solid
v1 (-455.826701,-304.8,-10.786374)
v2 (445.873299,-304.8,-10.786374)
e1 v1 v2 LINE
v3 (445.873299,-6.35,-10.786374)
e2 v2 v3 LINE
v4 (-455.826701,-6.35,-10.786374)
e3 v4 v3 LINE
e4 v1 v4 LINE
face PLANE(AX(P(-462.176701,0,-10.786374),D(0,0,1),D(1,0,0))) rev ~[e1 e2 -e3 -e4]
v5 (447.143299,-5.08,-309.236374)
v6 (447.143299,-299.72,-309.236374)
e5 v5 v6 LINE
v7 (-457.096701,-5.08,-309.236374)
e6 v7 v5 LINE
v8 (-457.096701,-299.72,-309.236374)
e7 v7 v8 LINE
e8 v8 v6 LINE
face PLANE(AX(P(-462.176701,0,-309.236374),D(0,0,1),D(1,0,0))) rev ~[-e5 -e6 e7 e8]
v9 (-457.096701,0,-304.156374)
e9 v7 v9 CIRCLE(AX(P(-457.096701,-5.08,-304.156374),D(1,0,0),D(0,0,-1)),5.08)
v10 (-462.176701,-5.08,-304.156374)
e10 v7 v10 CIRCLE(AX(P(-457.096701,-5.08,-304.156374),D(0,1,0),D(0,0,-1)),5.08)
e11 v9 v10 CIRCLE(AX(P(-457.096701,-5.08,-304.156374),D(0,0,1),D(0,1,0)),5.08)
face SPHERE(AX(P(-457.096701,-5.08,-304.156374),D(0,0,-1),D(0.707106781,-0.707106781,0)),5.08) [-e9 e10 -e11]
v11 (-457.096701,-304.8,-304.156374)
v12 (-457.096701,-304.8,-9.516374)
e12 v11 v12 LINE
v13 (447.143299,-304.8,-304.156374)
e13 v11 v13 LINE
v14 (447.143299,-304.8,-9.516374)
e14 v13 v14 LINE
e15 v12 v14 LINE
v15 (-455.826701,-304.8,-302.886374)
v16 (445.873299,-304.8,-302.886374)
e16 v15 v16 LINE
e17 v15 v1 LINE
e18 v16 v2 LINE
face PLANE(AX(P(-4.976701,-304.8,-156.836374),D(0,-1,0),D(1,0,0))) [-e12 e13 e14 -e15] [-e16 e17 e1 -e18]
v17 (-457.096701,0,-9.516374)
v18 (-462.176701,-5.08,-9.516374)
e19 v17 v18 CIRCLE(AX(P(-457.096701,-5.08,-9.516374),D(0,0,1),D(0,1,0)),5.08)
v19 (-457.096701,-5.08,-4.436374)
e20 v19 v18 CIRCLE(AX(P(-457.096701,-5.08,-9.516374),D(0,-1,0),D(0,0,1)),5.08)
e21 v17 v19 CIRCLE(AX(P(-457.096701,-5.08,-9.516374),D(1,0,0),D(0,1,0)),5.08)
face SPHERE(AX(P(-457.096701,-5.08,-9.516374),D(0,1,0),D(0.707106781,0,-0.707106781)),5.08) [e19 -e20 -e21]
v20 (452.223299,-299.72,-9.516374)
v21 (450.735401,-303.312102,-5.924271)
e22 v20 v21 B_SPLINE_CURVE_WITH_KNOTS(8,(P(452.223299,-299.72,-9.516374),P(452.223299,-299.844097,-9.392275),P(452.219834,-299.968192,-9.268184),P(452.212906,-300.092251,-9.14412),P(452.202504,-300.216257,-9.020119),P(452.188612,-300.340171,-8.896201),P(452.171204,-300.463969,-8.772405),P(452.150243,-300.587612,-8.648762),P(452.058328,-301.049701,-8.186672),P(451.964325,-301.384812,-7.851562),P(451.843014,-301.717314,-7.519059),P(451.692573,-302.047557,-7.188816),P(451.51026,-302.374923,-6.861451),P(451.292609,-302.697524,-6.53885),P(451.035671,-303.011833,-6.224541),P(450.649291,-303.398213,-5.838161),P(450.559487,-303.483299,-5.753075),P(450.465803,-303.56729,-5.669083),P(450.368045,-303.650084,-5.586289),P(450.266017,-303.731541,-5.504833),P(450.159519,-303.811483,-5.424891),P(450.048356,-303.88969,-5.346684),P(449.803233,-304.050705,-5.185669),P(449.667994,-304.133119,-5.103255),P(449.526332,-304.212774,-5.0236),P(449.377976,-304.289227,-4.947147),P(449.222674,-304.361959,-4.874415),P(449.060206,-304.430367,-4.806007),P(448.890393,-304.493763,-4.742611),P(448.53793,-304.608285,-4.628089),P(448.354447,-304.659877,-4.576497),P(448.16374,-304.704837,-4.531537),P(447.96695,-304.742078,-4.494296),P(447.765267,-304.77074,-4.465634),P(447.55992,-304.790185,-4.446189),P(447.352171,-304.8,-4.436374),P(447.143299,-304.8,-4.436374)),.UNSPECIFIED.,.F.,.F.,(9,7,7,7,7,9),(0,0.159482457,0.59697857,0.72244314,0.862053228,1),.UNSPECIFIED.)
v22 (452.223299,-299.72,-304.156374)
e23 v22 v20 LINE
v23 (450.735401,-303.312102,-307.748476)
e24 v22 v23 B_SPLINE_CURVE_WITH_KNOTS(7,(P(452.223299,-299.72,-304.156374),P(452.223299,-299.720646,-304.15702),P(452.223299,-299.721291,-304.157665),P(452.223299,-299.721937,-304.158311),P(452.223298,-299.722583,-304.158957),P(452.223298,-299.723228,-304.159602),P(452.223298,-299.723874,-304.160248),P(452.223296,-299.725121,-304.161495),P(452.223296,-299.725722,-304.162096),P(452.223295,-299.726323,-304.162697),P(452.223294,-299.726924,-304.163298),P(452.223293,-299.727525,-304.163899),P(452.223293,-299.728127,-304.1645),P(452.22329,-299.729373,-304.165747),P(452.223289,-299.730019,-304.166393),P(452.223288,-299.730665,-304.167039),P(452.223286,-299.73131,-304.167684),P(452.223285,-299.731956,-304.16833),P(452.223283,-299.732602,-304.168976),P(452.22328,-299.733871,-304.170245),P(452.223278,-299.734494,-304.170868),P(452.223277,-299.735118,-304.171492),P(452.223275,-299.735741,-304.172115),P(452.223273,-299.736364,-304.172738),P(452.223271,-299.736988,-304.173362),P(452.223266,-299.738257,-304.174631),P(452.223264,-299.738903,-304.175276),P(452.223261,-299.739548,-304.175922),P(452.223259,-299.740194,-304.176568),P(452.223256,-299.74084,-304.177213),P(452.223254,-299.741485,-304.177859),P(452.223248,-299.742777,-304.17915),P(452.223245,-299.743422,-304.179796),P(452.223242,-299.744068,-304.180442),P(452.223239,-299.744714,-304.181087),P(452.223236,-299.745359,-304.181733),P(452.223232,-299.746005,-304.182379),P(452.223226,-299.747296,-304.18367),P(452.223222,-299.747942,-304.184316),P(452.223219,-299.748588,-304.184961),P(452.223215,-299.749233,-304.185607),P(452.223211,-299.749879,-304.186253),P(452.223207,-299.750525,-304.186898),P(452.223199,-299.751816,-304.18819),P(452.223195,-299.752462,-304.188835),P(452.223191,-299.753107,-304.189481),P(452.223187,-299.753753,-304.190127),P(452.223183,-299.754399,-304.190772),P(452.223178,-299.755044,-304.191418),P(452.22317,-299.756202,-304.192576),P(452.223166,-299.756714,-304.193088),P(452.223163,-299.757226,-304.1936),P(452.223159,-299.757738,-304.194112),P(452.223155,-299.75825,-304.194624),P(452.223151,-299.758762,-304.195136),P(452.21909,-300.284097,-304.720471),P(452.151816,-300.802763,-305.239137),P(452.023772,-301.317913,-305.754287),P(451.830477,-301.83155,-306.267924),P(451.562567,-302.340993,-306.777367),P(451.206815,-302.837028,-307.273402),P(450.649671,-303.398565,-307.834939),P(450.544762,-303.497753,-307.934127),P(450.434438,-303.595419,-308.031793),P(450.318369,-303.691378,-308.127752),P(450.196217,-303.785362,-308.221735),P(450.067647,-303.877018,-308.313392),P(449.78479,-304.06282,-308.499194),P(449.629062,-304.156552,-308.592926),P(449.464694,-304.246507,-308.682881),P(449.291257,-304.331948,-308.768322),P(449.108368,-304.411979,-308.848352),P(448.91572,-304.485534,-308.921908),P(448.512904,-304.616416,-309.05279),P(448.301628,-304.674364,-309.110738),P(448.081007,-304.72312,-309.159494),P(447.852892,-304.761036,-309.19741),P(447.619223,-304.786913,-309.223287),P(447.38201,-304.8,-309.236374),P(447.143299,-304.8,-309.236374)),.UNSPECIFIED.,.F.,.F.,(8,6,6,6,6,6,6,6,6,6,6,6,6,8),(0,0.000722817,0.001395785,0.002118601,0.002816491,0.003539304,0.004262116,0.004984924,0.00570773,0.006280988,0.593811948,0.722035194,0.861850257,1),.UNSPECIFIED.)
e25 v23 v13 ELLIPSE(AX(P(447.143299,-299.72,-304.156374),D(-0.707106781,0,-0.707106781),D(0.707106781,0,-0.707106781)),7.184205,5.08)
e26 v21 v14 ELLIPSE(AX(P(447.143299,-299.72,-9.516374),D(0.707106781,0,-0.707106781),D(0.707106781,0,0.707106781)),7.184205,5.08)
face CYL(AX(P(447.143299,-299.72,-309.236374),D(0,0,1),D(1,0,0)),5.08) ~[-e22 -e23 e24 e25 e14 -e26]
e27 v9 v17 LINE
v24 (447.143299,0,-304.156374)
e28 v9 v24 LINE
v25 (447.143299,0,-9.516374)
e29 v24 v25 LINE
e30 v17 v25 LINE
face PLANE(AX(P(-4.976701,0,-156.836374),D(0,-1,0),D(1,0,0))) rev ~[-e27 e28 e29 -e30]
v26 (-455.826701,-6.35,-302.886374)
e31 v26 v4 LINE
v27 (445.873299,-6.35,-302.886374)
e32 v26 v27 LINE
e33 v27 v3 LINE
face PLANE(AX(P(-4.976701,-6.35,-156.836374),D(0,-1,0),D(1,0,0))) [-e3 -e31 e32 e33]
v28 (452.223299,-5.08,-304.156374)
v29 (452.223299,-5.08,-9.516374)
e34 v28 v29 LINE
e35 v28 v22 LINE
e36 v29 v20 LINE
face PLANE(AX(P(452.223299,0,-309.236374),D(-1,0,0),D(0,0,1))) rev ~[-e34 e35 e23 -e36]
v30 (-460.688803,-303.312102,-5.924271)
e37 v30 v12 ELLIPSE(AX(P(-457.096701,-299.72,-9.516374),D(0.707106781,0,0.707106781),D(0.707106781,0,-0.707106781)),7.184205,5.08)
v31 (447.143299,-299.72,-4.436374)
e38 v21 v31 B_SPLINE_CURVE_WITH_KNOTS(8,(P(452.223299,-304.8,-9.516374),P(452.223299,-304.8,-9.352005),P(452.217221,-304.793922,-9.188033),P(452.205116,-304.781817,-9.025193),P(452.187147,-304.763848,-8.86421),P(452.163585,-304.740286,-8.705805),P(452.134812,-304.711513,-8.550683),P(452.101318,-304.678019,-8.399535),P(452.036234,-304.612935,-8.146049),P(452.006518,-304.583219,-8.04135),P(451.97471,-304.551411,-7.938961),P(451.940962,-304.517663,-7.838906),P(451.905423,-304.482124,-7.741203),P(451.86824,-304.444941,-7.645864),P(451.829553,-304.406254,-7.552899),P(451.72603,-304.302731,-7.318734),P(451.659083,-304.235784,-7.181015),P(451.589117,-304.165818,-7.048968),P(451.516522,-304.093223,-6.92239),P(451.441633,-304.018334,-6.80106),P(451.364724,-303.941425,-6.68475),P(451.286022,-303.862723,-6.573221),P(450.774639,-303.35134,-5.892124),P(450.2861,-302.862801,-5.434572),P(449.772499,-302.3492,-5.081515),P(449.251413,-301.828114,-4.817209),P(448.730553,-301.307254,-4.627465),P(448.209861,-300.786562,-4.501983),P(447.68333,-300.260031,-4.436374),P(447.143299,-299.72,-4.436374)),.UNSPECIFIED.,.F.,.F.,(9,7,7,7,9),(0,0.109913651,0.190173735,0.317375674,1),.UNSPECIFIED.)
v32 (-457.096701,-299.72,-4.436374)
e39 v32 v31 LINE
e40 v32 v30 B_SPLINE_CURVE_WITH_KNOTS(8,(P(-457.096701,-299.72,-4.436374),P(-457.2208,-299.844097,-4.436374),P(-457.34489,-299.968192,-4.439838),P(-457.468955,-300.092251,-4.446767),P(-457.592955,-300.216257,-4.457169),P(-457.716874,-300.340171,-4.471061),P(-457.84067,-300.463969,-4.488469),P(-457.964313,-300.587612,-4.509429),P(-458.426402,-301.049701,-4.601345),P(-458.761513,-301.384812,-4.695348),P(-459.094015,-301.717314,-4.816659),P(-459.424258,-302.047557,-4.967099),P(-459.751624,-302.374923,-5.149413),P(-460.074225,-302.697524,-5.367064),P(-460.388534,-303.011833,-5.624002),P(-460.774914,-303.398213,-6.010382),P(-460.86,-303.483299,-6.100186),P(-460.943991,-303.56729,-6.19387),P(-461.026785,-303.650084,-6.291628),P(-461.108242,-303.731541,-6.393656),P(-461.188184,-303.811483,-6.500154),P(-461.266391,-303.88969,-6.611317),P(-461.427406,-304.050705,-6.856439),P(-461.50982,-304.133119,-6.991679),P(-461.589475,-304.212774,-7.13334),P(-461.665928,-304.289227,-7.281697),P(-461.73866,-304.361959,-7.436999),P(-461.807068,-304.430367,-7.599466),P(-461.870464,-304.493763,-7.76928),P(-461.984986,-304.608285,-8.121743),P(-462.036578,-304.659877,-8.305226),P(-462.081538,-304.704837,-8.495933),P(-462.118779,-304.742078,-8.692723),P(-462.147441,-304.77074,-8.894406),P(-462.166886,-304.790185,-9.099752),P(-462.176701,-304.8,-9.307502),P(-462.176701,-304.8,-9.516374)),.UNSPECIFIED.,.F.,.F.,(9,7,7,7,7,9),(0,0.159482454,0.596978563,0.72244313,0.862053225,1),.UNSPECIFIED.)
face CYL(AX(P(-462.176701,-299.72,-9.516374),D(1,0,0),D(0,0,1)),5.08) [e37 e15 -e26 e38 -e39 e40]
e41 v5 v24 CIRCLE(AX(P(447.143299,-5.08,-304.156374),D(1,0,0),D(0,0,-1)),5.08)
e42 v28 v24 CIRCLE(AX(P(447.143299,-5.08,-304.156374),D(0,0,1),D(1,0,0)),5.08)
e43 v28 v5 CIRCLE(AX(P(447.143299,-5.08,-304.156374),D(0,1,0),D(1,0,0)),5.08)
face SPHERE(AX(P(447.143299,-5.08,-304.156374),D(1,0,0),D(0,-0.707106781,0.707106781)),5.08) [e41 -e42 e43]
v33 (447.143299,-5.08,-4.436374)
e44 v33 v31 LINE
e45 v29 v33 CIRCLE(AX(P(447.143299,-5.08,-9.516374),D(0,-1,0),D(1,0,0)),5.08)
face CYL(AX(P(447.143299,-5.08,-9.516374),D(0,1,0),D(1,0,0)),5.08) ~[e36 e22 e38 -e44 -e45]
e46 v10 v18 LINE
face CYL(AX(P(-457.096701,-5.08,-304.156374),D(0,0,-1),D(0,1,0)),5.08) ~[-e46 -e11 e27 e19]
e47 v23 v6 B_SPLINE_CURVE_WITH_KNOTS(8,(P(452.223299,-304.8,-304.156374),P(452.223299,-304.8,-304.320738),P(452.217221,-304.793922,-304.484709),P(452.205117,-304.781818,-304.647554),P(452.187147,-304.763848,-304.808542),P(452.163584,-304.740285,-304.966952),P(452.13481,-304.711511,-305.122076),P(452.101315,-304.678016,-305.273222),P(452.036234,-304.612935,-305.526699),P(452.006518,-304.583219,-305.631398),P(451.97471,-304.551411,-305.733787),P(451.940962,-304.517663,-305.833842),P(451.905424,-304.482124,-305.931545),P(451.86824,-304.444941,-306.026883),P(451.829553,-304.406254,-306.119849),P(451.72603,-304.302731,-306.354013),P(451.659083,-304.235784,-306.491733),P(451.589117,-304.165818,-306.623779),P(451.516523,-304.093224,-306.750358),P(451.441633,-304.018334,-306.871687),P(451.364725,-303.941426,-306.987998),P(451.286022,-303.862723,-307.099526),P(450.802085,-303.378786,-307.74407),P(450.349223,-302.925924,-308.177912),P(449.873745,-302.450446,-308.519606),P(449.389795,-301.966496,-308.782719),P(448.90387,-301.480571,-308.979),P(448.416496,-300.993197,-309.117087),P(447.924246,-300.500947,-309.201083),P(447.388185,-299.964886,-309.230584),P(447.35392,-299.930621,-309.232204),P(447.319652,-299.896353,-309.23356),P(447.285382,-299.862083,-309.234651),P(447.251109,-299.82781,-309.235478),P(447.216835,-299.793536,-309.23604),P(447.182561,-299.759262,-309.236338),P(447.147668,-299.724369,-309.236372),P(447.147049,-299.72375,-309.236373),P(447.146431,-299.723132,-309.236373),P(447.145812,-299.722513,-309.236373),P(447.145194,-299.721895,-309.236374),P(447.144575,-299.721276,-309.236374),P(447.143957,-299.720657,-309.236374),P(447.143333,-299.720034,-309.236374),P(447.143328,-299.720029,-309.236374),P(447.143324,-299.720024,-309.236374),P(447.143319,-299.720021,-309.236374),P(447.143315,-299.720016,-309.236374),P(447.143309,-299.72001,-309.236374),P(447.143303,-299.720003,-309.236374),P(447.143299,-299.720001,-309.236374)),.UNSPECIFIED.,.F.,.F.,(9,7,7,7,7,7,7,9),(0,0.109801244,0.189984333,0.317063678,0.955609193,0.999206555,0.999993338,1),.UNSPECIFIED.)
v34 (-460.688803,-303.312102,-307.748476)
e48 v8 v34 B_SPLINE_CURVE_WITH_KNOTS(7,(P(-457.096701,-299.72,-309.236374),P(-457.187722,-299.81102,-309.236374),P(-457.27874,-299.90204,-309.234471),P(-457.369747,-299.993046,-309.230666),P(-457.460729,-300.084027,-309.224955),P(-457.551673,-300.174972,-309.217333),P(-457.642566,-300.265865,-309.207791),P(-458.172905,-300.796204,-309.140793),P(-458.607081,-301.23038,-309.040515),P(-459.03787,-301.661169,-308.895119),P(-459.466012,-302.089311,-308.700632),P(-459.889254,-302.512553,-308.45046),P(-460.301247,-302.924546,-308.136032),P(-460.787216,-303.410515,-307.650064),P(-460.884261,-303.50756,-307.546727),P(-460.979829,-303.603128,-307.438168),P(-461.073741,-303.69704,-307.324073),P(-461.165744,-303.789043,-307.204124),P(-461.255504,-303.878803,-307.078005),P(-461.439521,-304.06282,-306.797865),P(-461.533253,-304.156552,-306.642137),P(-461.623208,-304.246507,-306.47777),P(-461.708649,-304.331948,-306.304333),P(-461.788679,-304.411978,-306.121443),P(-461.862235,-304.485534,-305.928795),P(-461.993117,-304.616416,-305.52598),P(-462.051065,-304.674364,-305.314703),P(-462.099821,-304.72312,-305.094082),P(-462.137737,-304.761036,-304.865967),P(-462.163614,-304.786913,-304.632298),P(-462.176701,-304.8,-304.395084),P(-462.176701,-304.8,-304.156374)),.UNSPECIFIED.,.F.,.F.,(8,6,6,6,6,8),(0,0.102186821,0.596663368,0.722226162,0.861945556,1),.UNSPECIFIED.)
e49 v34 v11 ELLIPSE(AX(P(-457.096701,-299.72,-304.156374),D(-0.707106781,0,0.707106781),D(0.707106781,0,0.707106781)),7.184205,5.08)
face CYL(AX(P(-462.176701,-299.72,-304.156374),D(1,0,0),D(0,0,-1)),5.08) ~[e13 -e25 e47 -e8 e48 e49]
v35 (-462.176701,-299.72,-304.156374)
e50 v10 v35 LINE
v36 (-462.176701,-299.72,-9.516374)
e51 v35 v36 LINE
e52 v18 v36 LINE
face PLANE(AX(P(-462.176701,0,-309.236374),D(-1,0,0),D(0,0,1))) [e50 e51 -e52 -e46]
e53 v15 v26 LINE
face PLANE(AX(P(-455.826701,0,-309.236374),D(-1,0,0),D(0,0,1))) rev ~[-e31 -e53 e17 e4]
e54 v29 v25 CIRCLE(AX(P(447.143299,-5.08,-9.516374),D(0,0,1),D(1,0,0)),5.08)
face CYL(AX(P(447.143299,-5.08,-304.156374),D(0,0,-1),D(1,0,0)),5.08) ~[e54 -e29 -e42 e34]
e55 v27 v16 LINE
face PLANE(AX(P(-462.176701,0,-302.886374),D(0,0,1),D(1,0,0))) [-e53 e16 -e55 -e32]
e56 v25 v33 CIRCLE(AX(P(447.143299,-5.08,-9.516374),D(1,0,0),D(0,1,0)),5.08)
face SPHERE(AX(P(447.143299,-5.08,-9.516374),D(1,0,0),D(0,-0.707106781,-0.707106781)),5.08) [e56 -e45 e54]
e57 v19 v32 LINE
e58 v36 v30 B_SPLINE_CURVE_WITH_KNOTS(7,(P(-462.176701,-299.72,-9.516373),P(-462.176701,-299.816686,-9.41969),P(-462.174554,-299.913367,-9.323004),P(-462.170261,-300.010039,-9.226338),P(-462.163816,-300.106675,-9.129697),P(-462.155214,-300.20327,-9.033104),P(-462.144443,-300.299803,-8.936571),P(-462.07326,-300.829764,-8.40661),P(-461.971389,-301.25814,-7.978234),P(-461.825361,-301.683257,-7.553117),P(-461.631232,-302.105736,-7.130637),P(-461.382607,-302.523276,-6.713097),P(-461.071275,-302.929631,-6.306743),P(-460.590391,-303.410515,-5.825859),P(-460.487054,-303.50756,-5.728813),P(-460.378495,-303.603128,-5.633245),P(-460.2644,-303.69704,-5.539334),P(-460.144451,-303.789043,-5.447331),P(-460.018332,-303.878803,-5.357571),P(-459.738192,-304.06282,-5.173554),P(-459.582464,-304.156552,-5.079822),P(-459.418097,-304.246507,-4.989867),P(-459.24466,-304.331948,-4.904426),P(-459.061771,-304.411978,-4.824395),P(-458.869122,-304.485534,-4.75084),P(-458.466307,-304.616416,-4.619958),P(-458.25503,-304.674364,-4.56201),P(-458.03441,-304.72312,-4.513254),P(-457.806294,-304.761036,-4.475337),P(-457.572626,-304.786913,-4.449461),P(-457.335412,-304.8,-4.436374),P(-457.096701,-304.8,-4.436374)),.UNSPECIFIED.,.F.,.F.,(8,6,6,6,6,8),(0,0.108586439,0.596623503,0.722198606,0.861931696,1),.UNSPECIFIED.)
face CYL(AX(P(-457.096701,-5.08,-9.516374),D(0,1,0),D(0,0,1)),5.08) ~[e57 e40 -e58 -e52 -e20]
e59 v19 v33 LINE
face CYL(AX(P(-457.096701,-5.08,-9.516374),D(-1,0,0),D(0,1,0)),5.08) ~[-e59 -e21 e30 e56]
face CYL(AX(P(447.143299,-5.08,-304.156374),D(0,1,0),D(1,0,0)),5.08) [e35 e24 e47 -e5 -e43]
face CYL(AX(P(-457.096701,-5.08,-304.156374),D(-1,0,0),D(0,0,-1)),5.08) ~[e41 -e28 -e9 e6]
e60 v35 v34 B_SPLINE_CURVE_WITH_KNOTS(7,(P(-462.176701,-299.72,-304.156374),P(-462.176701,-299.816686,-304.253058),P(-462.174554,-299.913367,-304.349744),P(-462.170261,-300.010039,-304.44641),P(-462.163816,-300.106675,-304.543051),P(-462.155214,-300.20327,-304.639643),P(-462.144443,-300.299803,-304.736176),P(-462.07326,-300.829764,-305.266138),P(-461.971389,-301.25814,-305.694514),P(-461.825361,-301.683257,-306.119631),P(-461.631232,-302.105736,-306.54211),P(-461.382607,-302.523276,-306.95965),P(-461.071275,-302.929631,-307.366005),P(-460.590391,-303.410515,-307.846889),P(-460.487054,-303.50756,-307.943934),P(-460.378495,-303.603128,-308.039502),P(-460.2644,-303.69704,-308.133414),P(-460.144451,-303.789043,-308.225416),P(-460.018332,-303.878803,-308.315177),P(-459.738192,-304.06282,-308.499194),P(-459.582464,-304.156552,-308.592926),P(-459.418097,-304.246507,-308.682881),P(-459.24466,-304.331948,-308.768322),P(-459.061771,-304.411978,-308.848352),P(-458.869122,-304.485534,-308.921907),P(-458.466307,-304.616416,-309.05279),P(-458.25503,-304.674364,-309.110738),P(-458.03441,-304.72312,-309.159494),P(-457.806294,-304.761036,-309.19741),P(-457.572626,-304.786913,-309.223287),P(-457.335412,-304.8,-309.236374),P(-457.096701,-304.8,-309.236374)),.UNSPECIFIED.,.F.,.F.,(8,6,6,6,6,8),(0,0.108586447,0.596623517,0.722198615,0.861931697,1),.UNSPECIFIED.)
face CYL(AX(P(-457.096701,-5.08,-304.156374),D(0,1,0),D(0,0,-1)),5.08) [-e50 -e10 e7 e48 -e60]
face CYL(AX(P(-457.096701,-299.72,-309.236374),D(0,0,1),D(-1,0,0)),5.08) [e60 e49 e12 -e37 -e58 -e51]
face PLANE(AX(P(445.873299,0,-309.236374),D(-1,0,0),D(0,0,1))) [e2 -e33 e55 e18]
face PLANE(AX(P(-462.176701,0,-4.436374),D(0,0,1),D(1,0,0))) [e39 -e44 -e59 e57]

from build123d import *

# Parameters (mm, degrees)
F0_W         = 914.4
F0_H         = 304.8
F1_DEPTH     = 304.8
F2_T         = -6.35
F3_R         = 5.08
F4_T1_DEPTH  = 307.34
F4_T3_DEPTH  = 904.24
F4_T5_DEPTH  = 294.64
F4_S9_W      = 5.1816
F4_S9_H      = 5.1816
F4_T10_DEPTH = 5.1816
F4_S15_W     = 5.1816
F4_S15_H     = 5.1816
F4_T16_DEPTH = 5.1816
F4_S21_W     = 5.1816
F4_S21_H     = 5.1816
F4_T22_DEPTH = 5.1816
F4_S27_W     = 5.1816
F4_S27_H     = 5.1816
F4_T28_DEPTH = 5.1816


# Not quite as in the source:
# - a fillet or chamfer that OpenCascade refuses, or shapes differently, is made with other operations: its cross-section is extruded or revolved along the edge and cut away or added


with BuildPart() as f1:
    # F0 (on Front) → F1 (new body)
    with BuildSketch(Plane.XZ):
        with Locations((-4.9767009914, -156.8363738472)):
            Rectangle(F0_W, F0_H)
    extrude(amount=F1_DEPTH)

    # F2
    f2_openings = [f1.faces().sort_by_distance(p)[0] for p in [
        (-4.976701, -304.8, -156.836374),
    ]]
    offset(amount=F2_T, openings=f2_openings)

    # F3
    f3_edges = [f1.edges().sort_by_distance(p)[0] for p in [
        (-4.976701, -304.8, -4.436374),
        (-462.176701, -304.8, -156.836374),
        (-4.976701, -304.8, -309.236374),
        (452.223299, -304.8, -156.836374),
    ]]
    fillet(f3_edges, radius=F3_R)

    # F4: fillet of radius 5.08 on 12 edges, made by hand

    # F4_s2 → F4_t1 (cut)
    with BuildSketch(Plane.XZ.offset(5.08)):
        with BuildLine():
            ThreePointArc((452.2232990086, -9.5163738472), (450.735401457, -5.9242713988), (447.1432990086, -4.4363738472))
            Line((447.1432990086, -4.4363738472), (452.2232990086, -4.4363738472))
            Line((452.2232990086, -4.4363738472), (452.2232990086, -9.5163738472))
        make_face()
        with BuildLine():
            ThreePointArc((-457.0967009914, -4.4363738472), (-460.6888034398, -5.9242713988), (-462.1767009914, -9.5163738472))
            Line((-462.1767009914, -9.5163738472), (-462.1767009914, -4.4363738472))
            Line((-462.1767009914, -4.4363738472), (-457.0967009914, -4.4363738472))
        make_face()
        with BuildLine():
            ThreePointArc((-457.0967009914, -309.2363738472), (-460.6888034398, -307.7484762956), (-462.1767009914, -304.1563738472))
            Line((-462.1767009914, -304.1563738472), (-462.1767009914, -309.2363738472))
            Line((-462.1767009914, -309.2363738472), (-457.0967009914, -309.2363738472))
        make_face()
        with BuildLine():
            ThreePointArc((452.2232990086, -304.1563738472), (450.735401457, -307.7484762956), (447.1432990086, -309.2363738472))
            Line((447.1432990086, -309.2363738472), (452.2232990086, -309.2363738472))
            Line((452.2232990086, -309.2363738472), (452.2232990086, -304.1563738472))
        make_face()
    extrude(amount=F4_T1_DEPTH, mode=Mode.SUBTRACT)

    # F4_s4 → F4_t3 (cut)
    with BuildSketch(Plane.YZ.offset(-457.0967009914)):
        with BuildLine():
            ThreePointArc((0, -9.5163738472), (-1.4878975516, -5.9242713988), (-5.08, -4.4363738472))
            Line((-5.08, -4.4363738472), (0, -4.4363738472))
            Line((0, -4.4363738472), (0, -9.5163738472))
        make_face()
        with BuildLine():
            ThreePointArc((-5.08, -309.2363738472), (-1.4878975516, -307.7484762956), (0, -304.1563738472))
            Line((0, -304.1563738472), (0, -309.2363738472))
            Line((0, -309.2363738472), (-5.08, -309.2363738472))
        make_face()
    extrude(amount=F4_T3_DEPTH, mode=Mode.SUBTRACT)

    # F4_s6 → F4_t5 (cut)
    with BuildSketch(Plane.XY.offset(-304.1563738472)):
        with BuildLine():
            ThreePointArc((-457.0967009914, 0), (-460.6888034398, -1.4878975516), (-462.1767009914, -5.08))
            Line((-462.1767009914, -5.08), (-462.1767009914, 0))
            Line((-462.1767009914, 0), (-457.0967009914, 0))
        make_face()
        with BuildLine():
            ThreePointArc((452.2232990086, -5.08), (450.735401457, -1.4878975516), (447.1432990086, 0))
            Line((447.1432990086, 0), (452.2232990086, 0))
            Line((452.2232990086, 0), (452.2232990086, -5.08))
        make_face()
    extrude(amount=F4_T5_DEPTH, mode=Mode.SUBTRACT)


with BuildPart() as f4_tool8:
    # F4_s9 → F4_t10 (new body)
    with BuildSketch(Plane.YZ.offset(447.1432990086)):
        with Locations((-2.4892, -6.9255738472)):
            Rectangle(F4_S9_W, F4_S9_H)
    extrude(amount=F4_T10_DEPTH)

    # F4_s11 → F4_t12 (revolve, cut)
    with BuildSketch(Plane(origin=(447.1432990086, -5.08, -9.5163738472), x_dir=(0, -0.7071067812, -0.7071067812), z_dir=(0, -0.7071067812, 0.7071067812))):
        with BuildLine():
            ThreePointArc((0, -5.08), (5.08, 0), (0, 5.08))
            Line((0, 5.08), (0, -5.08))
        make_face()
    revolve(axis=Axis((447.1432990086, -5.08, -9.5163738472), (1, 0, 0)), mode=Mode.SUBTRACT)


with BuildPart() as f1_1:
    add(f1.part)

    # F4_t7: cut F4_tool8
    add(f4_tool8.part, mode=Mode.SUBTRACT)


with BuildPart() as f4_tool14:
    # F4_s15 → F4_t16 (new body)
    with BuildSketch(Plane.XZ.offset(5.08)):
        with Locations((-459.6875009914, -6.9255738472)):
            Rectangle(F4_S15_W, F4_S15_H)
    extrude(amount=-F4_T16_DEPTH)

    # F4_s17 → F4_t18 (revolve, cut)
    with BuildSketch(Plane(origin=(-457.0967009914, -5.08, -9.5163738472), x_dir=(0.7071067812, 0, -0.7071067812), z_dir=(0.7071067812, 0, 0.7071067812))):
        with BuildLine():
            ThreePointArc((0, -5.08), (5.08, 0), (0, 5.08))
            Line((0, 5.08), (0, -5.08))
        make_face()
    revolve(axis=Axis((-457.0967009914, -5.08, -9.5163738472), (0, 1, 0)), mode=Mode.SUBTRACT)


with BuildPart() as f1_2:
    add(f1_1.part)

    # F4_t13: cut F4_tool14
    add(f4_tool14.part, mode=Mode.SUBTRACT)


with BuildPart() as f4_tool20:
    # F4_s21 → F4_t22 (new body)
    with BuildSketch(Plane.XY.offset(-304.1563738472)):
        with Locations((-459.6875009914, -2.4892)):
            Rectangle(F4_S21_W, F4_S21_H)
    extrude(amount=-F4_T22_DEPTH)

    # F4_s23 → F4_t24 (revolve, cut)
    with BuildSketch(Plane(origin=(-457.0967009914, -5.08, -304.1563738472), x_dir=(0.7071067812, -0.7071067812, 0), z_dir=(0.7071067812, 0.7071067812, 0))):
        with BuildLine():
            ThreePointArc((0, -5.08), (5.08, 0), (0, 5.08))
            Line((0, 5.08), (0, -5.08))
        make_face()
    revolve(axis=Axis((-457.0967009914, -5.08, -304.1563738472), (0, 0, -1)), mode=Mode.SUBTRACT)


with BuildPart() as f1_3:
    add(f1_2.part)

    # F4_t19: cut F4_tool20
    add(f4_tool20.part, mode=Mode.SUBTRACT)


with BuildPart() as f4_tool26:
    # F4_s27 → F4_t28 (new body)
    with BuildSketch(Plane.YZ.offset(447.1432990086)):
        with Locations((-2.4892, -306.7471738472)):
            Rectangle(F4_S27_W, F4_S27_H)
    extrude(amount=F4_T28_DEPTH)

    # F4_s29 → F4_t30 (revolve, cut)
    with BuildSketch(Plane(origin=(447.1432990086, -5.08, -304.1563738472), x_dir=(0, -0.7071067812, 0.7071067812), z_dir=(0, 0.7071067812, 0.7071067812))):
        with BuildLine():
            ThreePointArc((0, -5.08), (5.08, 0), (0, 5.08))
            Line((0, 5.08), (0, -5.08))
        make_face()
    revolve(axis=Axis((447.1432990086, -5.08, -304.1563738472), (1, 0, 0)), mode=Mode.SUBTRACT)


with BuildPart() as f1_4:
    add(f1_3.part)

    # F4_t25: cut F4_tool26
    add(f4_tool26.part, mode=Mode.SUBTRACT)


solid = f1_4.part
